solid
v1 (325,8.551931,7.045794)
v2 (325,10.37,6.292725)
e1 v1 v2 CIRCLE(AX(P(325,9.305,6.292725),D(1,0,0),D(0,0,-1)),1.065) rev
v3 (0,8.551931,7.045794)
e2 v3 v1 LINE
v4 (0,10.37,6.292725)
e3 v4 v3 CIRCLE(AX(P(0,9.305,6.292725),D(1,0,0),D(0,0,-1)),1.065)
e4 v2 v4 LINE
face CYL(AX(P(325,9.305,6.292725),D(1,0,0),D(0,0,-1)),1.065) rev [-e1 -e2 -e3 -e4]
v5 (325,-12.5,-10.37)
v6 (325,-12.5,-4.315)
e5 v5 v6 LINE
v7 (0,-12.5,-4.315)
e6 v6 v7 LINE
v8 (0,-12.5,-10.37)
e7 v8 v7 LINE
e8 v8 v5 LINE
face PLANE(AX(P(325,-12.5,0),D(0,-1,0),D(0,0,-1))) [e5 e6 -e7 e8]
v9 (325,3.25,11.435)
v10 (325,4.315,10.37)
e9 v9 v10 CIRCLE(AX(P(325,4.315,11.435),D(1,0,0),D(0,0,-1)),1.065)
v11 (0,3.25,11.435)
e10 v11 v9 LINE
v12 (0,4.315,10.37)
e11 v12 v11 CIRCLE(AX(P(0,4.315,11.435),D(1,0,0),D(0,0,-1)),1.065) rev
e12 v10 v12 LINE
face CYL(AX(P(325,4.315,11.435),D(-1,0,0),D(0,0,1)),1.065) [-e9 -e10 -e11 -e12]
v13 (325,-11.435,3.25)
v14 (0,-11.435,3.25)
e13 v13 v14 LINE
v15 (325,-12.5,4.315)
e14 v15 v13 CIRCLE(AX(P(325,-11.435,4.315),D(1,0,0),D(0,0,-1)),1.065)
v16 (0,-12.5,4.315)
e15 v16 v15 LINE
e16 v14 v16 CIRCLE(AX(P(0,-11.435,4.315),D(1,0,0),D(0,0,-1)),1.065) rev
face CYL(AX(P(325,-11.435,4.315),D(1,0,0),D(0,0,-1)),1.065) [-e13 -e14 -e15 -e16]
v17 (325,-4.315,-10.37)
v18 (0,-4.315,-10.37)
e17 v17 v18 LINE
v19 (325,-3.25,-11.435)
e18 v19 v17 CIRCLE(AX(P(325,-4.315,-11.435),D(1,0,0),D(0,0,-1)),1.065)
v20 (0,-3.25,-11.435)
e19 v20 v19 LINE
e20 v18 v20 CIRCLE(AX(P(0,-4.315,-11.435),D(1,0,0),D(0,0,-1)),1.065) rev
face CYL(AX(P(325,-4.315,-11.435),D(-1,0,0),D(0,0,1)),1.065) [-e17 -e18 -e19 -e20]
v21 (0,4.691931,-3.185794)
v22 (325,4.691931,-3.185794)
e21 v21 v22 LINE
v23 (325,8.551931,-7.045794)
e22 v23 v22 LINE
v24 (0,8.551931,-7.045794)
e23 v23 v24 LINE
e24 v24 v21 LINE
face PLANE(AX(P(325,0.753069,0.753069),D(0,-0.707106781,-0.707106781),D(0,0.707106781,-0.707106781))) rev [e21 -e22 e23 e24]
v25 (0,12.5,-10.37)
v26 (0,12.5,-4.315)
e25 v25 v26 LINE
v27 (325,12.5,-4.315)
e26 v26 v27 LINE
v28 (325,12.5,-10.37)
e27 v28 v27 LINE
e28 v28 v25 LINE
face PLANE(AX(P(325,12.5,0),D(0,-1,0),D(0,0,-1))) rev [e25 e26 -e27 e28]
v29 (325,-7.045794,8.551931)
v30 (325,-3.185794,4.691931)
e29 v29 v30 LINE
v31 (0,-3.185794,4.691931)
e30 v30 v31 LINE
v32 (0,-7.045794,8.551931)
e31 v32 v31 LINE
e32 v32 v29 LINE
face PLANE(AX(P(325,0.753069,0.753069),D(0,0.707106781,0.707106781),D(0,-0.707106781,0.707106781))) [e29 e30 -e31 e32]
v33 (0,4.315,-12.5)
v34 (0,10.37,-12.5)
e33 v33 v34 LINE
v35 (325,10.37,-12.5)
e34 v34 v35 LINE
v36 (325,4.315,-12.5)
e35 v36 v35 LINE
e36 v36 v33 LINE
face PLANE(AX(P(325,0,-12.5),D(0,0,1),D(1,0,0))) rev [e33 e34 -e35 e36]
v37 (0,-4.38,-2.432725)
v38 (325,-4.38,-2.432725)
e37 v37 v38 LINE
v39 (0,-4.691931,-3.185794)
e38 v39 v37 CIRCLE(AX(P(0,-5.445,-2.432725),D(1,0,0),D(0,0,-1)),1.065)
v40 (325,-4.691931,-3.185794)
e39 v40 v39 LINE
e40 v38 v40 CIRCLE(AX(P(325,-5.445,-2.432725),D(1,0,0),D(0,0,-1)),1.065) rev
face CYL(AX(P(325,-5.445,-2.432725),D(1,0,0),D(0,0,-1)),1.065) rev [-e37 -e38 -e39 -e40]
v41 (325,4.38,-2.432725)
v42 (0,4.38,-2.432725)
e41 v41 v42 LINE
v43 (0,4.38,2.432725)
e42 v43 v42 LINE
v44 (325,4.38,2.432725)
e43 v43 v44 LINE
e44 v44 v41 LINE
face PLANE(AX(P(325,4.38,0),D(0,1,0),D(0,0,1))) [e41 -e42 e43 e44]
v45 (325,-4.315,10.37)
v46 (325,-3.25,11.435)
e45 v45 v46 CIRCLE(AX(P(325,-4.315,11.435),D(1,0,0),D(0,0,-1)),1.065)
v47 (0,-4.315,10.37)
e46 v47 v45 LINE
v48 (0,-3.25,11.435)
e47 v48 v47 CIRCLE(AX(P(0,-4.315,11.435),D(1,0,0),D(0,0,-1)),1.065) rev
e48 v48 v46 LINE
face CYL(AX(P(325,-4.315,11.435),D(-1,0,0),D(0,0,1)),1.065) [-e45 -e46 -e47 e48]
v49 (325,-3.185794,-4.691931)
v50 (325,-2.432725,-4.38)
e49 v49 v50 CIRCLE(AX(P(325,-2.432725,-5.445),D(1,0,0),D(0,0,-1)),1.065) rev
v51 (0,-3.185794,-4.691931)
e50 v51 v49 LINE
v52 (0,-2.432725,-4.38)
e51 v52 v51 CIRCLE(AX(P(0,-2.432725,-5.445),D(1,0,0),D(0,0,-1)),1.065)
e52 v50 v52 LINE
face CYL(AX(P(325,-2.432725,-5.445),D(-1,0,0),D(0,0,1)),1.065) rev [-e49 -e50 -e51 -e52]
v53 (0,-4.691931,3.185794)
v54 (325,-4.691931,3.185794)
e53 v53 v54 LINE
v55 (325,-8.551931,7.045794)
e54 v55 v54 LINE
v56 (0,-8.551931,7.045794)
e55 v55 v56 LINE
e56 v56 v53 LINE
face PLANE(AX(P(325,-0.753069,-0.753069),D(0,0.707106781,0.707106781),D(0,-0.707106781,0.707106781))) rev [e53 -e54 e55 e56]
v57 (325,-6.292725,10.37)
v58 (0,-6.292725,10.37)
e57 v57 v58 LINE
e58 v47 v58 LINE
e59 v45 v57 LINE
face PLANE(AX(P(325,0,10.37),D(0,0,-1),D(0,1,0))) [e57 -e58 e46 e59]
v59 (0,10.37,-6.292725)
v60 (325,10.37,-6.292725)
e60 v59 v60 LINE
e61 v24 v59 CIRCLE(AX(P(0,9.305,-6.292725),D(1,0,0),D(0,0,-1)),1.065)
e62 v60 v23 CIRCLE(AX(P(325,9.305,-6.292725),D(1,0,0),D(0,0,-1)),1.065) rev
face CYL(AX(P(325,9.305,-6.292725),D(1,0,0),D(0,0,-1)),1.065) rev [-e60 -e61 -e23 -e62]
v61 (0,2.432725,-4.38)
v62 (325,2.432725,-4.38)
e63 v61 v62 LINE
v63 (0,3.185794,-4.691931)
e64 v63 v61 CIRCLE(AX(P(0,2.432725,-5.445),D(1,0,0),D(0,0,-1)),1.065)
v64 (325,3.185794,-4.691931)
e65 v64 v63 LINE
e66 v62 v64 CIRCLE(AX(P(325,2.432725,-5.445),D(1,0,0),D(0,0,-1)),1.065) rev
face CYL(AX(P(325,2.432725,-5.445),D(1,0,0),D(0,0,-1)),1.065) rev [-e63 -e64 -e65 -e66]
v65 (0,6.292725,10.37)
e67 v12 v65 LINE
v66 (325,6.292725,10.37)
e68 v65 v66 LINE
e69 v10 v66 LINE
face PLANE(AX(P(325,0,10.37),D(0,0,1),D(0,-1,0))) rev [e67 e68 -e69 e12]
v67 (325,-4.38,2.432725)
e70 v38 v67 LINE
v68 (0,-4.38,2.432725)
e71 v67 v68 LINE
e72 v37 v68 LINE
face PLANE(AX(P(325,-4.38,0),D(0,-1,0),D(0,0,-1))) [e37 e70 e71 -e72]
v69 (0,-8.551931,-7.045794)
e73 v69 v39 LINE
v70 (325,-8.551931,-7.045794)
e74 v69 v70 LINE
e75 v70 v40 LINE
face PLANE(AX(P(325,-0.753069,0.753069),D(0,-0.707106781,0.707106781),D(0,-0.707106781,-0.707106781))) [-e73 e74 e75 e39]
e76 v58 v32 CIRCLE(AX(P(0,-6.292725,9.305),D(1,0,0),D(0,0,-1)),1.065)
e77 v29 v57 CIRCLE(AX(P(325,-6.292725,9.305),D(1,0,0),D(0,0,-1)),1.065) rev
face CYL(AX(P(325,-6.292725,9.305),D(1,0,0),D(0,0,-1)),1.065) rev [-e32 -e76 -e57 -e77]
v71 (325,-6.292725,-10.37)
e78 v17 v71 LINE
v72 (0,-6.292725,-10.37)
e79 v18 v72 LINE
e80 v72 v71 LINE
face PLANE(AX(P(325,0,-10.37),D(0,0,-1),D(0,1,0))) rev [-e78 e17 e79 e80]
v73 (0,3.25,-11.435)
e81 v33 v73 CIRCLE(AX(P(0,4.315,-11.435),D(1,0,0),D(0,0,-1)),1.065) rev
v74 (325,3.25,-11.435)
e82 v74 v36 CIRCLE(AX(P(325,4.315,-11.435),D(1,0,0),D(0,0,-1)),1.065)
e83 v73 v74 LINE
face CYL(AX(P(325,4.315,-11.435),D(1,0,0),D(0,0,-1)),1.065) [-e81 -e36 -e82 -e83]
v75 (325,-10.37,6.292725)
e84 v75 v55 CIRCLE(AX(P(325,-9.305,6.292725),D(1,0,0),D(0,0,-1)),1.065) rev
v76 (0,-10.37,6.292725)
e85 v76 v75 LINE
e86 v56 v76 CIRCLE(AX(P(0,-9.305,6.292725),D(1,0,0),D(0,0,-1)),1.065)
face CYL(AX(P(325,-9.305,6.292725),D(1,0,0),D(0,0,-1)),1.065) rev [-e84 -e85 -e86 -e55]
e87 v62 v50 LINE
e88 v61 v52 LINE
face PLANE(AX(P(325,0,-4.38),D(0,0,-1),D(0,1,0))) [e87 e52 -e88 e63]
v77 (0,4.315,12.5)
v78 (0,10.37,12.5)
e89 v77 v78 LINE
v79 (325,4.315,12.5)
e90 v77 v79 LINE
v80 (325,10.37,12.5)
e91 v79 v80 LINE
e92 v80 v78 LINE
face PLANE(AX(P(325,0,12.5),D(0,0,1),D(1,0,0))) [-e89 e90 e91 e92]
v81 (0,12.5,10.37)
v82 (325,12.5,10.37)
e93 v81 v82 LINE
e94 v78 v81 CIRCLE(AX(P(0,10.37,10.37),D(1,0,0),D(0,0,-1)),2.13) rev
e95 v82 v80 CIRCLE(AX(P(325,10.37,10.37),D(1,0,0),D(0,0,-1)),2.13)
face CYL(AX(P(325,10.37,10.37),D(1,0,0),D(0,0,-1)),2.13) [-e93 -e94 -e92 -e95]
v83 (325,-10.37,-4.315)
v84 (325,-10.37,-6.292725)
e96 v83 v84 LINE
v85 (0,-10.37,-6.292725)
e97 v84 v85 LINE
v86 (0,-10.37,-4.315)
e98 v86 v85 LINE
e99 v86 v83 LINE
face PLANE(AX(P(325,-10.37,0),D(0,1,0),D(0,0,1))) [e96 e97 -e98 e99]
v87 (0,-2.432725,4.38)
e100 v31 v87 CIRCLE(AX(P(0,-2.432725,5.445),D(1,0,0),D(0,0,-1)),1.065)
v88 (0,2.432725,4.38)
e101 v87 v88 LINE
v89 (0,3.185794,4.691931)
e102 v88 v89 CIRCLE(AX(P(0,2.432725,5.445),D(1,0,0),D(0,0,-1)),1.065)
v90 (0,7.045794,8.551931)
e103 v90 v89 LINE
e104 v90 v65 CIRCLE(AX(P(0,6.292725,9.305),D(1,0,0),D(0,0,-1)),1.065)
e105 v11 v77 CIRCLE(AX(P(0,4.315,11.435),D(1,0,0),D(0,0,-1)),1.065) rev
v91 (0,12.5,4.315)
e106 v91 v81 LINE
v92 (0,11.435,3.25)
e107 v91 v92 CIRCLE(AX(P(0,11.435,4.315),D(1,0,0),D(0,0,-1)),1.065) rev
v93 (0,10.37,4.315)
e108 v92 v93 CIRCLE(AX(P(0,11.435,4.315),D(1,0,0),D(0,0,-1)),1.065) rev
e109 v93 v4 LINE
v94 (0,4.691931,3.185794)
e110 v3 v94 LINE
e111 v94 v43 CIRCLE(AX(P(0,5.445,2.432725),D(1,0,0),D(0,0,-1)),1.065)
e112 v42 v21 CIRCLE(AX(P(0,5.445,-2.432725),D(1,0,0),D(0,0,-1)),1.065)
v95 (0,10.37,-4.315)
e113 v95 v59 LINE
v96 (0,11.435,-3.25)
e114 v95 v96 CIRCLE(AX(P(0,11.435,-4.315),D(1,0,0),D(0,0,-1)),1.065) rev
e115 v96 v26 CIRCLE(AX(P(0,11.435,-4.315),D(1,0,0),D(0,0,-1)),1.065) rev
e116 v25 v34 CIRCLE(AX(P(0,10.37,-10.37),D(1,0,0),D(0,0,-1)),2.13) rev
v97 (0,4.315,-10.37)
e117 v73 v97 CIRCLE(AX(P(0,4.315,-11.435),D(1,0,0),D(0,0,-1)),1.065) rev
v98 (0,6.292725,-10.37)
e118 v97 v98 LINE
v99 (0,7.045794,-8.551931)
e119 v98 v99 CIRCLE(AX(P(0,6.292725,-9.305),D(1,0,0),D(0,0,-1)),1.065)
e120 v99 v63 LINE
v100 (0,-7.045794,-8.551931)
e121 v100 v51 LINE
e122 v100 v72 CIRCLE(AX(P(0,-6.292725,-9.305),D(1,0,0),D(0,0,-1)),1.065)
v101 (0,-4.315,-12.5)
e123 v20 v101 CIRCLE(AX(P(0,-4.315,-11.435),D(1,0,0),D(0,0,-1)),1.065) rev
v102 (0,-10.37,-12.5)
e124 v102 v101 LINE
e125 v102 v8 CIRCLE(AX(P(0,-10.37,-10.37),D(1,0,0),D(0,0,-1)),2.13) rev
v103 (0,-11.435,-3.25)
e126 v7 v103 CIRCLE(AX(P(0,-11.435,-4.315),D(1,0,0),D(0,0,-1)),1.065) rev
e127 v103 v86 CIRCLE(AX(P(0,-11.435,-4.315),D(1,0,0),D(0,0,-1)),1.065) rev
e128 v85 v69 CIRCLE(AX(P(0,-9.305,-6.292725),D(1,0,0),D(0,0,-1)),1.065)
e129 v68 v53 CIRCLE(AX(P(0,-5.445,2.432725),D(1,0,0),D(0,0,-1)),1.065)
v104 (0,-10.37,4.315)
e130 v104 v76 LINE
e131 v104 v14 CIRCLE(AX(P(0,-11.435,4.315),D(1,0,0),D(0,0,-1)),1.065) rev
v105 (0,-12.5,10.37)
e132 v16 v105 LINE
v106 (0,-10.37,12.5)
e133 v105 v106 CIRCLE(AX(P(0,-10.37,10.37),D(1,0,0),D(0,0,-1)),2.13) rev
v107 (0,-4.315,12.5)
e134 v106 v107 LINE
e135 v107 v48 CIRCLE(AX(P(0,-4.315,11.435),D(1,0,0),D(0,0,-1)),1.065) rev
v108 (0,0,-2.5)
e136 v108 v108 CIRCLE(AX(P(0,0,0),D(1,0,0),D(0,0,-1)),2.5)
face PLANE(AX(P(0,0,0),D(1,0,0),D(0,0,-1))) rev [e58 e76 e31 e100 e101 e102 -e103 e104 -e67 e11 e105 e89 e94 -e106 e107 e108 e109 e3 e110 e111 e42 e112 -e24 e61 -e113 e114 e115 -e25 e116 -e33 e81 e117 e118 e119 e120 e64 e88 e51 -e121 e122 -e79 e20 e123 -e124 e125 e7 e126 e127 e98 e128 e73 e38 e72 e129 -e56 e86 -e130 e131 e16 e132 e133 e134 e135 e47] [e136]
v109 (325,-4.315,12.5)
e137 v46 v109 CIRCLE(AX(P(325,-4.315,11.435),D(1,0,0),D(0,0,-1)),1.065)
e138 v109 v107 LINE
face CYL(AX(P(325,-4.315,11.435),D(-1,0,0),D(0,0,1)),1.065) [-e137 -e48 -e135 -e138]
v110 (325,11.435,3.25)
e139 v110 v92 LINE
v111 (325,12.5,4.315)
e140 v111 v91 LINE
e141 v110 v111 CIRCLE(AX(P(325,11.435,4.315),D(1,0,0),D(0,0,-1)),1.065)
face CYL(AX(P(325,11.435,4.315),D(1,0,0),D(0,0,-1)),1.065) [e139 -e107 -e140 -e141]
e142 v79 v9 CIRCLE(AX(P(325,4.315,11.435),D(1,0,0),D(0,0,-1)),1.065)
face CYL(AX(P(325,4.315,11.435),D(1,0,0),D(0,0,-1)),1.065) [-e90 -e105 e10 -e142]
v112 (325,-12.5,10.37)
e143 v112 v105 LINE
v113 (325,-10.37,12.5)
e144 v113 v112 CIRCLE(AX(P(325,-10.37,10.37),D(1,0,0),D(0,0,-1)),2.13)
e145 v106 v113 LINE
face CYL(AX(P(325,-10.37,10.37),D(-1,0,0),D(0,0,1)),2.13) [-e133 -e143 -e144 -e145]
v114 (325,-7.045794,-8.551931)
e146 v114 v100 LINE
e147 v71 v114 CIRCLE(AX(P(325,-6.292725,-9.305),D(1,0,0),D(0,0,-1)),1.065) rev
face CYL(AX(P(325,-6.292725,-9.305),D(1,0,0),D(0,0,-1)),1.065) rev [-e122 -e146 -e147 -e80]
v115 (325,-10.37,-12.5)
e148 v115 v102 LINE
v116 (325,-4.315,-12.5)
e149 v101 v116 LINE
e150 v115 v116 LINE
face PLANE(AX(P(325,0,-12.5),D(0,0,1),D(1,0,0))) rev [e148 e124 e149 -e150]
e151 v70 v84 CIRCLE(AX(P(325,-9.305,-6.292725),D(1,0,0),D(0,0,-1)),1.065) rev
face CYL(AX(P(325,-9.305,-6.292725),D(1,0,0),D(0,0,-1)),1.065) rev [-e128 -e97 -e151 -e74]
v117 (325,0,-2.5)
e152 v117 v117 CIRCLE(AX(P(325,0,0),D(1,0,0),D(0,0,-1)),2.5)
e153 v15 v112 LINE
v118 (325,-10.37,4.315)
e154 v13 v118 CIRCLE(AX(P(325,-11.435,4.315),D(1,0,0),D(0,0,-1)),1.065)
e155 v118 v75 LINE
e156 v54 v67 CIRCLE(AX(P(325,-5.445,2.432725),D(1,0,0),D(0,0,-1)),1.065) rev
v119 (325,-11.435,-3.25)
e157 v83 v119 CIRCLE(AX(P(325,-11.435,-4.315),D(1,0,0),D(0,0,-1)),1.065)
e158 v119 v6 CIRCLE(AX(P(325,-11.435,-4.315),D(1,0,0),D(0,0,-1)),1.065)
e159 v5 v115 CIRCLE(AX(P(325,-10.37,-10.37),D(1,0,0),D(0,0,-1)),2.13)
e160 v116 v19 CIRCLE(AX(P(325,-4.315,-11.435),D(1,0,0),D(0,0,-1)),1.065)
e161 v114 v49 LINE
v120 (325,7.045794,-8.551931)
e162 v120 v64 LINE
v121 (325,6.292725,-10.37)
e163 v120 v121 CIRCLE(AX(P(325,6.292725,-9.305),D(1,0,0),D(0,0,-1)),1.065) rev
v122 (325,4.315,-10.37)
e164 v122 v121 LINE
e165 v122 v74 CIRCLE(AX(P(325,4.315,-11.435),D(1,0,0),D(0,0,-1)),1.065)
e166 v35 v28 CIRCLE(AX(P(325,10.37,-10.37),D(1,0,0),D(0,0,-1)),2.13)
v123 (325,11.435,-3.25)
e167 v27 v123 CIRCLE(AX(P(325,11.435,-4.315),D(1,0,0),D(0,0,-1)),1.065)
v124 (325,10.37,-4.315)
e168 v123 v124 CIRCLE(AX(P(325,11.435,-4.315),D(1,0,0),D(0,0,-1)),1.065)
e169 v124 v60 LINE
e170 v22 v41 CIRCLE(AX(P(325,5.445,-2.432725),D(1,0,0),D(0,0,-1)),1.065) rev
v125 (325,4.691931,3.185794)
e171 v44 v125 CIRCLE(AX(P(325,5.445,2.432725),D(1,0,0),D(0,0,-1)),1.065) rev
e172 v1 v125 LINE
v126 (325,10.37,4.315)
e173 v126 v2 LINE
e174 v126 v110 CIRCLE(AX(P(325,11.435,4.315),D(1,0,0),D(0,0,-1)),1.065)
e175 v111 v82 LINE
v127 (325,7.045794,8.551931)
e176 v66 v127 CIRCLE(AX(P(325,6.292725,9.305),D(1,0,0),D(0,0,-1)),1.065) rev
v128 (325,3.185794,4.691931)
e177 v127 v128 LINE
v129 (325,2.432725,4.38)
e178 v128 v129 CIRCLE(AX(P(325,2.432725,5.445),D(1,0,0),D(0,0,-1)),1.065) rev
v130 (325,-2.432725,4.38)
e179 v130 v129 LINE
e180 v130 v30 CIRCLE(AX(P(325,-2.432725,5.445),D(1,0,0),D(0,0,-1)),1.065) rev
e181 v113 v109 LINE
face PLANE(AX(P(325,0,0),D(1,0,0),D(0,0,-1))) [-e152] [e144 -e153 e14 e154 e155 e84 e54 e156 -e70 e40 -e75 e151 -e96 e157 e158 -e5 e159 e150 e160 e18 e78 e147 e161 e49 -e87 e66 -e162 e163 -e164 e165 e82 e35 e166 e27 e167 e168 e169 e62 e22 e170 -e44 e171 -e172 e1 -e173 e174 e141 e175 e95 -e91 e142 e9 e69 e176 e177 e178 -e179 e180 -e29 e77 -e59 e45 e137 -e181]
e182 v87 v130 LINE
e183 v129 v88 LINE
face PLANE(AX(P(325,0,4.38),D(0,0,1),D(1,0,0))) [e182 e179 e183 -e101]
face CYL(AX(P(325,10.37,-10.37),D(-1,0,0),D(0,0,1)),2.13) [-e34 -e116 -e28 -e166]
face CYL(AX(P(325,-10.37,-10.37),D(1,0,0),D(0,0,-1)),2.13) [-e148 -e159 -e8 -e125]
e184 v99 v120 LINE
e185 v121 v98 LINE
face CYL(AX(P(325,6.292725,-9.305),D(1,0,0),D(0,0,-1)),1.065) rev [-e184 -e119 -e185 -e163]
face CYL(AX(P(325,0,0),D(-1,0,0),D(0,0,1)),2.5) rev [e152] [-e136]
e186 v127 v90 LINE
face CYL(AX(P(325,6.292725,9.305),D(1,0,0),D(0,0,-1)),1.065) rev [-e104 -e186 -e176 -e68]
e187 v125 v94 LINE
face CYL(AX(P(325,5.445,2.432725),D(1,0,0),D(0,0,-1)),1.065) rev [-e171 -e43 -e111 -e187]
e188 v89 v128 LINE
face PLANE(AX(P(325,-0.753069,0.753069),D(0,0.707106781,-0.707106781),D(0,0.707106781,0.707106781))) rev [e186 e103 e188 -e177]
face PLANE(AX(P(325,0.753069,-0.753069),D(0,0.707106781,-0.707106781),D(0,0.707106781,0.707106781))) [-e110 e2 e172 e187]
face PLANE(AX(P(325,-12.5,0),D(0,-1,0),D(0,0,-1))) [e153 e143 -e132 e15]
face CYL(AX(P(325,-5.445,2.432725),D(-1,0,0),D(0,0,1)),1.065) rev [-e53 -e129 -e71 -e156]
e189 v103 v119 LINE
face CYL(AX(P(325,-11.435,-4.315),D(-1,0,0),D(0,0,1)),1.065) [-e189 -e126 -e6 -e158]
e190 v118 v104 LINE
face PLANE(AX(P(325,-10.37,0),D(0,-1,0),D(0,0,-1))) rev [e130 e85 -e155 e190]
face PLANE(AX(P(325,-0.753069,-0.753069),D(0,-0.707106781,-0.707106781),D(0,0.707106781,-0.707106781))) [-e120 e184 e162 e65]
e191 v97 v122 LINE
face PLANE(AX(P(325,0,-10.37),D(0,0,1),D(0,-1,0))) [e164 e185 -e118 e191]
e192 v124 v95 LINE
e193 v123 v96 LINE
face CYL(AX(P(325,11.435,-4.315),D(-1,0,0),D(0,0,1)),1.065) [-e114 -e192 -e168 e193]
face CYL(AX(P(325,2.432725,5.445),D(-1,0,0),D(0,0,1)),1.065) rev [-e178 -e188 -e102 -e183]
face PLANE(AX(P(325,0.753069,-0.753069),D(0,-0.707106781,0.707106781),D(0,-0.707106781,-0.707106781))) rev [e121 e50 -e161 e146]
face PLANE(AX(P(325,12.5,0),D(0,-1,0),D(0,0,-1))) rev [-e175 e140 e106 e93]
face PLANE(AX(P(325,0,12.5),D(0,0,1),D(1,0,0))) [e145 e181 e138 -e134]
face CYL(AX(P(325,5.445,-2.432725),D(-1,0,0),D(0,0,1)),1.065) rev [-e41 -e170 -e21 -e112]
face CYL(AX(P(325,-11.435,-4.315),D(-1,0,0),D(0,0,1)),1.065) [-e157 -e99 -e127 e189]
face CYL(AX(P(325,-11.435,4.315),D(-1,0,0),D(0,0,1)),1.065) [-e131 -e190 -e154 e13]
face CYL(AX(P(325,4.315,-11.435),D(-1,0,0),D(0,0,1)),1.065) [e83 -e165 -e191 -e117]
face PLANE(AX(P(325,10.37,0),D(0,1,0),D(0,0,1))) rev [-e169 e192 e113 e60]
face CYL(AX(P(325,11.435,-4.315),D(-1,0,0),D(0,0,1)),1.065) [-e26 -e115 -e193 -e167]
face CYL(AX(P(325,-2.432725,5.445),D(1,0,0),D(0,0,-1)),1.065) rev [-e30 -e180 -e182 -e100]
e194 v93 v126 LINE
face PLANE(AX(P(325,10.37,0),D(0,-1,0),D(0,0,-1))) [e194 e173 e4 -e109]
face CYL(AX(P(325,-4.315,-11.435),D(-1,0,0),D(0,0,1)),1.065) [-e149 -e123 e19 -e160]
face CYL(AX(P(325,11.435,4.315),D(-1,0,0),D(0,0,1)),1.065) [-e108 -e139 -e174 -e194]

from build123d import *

# Parameters (mm, degrees)
SKETCH1_R           = 2.5
BOSS_EXTRUDE1_DEPTH = 325
FILLET1_R           = 1.065
FILLET2_R           = 2.13


with BuildPart() as part:
    # Sketch1 → Boss-Extrude1 (new body)
    with BuildSketch(Plane.YZ):
        Polygon((-12.5, -3.25), (-12.5, -12.5), (-3.25, -12.5), (-3.25, -10.37), (-8.863862556, -10.37), (-2.873862556, -4.38), (2.873862556, -4.38), (8.863862556, -10.37), (3.25, -10.37), (3.25, -12.5), (12.5, -12.5), (12.5, -3.25), (10.37, -3.25), (10.37, -8.863862556), (4.38, -2.873862556), (4.38, 2.873862556), (10.37, 8.863862556), (10.37, 3.25), (12.5, 3.25), (12.5, 12.5), (3.25, 12.5), (3.25, 10.37), (8.863862556, 10.37), (2.873862556, 4.38), (-2.873862556, 4.38), (-8.863862556, 10.37), (-3.25, 10.37), (-3.25, 12.5), (-12.5, 12.5), (-12.5, 3.25), (-10.37, 3.25), (-10.37, 8.863862556), (-4.38, 2.873862556), (-4.38, -2.873862556), (-10.37, -8.863862556), (-10.37, -3.25), align=None)
        with Locations(Location((0, 0, 0), (0, 0, 270))):
            Circle(SKETCH1_R, mode=Mode.SUBTRACT)
    extrude(amount=BOSS_EXTRUDE1_DEPTH)

    # Fillet1
    fillet1_edges = [part.edges().sort_by_distance(p)[0] for p in [
        (162.5, -10.37, -8.863862556),
        (162.5, 2.873862556, -4.38),
        (162.5, -2.873862556, -4.38),
        (162.5, -4.38, 2.873862556),
        (162.5, -4.38, -2.873862556),
        (162.5, -2.873862556, 4.38),
        (162.5, 2.873862556, 4.38),
        (162.5, 4.38, 2.873862556),
        (162.5, 4.38, -2.873862556),
        (162.5, -8.863862556, -10.37),
        (162.5, 8.863862556, -10.37),
        (162.5, 10.37, -8.863862556),
        (162.5, -10.37, 8.863862556),
        (162.5, -8.863862556, 10.37),
        (162.5, 10.37, 8.863862556),
        (162.5, 8.863862556, 10.37),
        (162.5, 12.5, 3.25),
        (162.5, -3.25, -12.5),
        (162.5, -10.37, 3.25),
        (162.5, 10.37, 3.25),
        (162.5, -10.37, -3.25),
        (162.5, -12.5, -3.25),
        (162.5, -12.5, 3.25),
        (162.5, 3.25, -10.37),
        (162.5, -3.25, -10.37),
        (162.5, 3.25, -12.5),
        (162.5, 10.37, -3.25),
        (162.5, 12.5, -3.25),
        (162.5, 3.25, 12.5),
        (162.5, 3.25, 10.37),
        (162.5, -3.25, 10.37),
        (162.5, -3.25, 12.5),
    ]]
    fillet(fillet1_edges, radius=FILLET1_R - 0.0001)  # a hair under: the kernel refuses the full size

    # Fillet2
    fillet2_edges = [part.edges().sort_by_distance(p)[0] for p in [
        (162.5, -12.5, 12.5),
        (162.5, 12.5, 12.5),
        (162.5, 12.5, -12.5),
        (162.5, -12.5, -12.5),
    ]]
    fillet(fillet2_edges, radius=FILLET2_R)


solid = part.part
